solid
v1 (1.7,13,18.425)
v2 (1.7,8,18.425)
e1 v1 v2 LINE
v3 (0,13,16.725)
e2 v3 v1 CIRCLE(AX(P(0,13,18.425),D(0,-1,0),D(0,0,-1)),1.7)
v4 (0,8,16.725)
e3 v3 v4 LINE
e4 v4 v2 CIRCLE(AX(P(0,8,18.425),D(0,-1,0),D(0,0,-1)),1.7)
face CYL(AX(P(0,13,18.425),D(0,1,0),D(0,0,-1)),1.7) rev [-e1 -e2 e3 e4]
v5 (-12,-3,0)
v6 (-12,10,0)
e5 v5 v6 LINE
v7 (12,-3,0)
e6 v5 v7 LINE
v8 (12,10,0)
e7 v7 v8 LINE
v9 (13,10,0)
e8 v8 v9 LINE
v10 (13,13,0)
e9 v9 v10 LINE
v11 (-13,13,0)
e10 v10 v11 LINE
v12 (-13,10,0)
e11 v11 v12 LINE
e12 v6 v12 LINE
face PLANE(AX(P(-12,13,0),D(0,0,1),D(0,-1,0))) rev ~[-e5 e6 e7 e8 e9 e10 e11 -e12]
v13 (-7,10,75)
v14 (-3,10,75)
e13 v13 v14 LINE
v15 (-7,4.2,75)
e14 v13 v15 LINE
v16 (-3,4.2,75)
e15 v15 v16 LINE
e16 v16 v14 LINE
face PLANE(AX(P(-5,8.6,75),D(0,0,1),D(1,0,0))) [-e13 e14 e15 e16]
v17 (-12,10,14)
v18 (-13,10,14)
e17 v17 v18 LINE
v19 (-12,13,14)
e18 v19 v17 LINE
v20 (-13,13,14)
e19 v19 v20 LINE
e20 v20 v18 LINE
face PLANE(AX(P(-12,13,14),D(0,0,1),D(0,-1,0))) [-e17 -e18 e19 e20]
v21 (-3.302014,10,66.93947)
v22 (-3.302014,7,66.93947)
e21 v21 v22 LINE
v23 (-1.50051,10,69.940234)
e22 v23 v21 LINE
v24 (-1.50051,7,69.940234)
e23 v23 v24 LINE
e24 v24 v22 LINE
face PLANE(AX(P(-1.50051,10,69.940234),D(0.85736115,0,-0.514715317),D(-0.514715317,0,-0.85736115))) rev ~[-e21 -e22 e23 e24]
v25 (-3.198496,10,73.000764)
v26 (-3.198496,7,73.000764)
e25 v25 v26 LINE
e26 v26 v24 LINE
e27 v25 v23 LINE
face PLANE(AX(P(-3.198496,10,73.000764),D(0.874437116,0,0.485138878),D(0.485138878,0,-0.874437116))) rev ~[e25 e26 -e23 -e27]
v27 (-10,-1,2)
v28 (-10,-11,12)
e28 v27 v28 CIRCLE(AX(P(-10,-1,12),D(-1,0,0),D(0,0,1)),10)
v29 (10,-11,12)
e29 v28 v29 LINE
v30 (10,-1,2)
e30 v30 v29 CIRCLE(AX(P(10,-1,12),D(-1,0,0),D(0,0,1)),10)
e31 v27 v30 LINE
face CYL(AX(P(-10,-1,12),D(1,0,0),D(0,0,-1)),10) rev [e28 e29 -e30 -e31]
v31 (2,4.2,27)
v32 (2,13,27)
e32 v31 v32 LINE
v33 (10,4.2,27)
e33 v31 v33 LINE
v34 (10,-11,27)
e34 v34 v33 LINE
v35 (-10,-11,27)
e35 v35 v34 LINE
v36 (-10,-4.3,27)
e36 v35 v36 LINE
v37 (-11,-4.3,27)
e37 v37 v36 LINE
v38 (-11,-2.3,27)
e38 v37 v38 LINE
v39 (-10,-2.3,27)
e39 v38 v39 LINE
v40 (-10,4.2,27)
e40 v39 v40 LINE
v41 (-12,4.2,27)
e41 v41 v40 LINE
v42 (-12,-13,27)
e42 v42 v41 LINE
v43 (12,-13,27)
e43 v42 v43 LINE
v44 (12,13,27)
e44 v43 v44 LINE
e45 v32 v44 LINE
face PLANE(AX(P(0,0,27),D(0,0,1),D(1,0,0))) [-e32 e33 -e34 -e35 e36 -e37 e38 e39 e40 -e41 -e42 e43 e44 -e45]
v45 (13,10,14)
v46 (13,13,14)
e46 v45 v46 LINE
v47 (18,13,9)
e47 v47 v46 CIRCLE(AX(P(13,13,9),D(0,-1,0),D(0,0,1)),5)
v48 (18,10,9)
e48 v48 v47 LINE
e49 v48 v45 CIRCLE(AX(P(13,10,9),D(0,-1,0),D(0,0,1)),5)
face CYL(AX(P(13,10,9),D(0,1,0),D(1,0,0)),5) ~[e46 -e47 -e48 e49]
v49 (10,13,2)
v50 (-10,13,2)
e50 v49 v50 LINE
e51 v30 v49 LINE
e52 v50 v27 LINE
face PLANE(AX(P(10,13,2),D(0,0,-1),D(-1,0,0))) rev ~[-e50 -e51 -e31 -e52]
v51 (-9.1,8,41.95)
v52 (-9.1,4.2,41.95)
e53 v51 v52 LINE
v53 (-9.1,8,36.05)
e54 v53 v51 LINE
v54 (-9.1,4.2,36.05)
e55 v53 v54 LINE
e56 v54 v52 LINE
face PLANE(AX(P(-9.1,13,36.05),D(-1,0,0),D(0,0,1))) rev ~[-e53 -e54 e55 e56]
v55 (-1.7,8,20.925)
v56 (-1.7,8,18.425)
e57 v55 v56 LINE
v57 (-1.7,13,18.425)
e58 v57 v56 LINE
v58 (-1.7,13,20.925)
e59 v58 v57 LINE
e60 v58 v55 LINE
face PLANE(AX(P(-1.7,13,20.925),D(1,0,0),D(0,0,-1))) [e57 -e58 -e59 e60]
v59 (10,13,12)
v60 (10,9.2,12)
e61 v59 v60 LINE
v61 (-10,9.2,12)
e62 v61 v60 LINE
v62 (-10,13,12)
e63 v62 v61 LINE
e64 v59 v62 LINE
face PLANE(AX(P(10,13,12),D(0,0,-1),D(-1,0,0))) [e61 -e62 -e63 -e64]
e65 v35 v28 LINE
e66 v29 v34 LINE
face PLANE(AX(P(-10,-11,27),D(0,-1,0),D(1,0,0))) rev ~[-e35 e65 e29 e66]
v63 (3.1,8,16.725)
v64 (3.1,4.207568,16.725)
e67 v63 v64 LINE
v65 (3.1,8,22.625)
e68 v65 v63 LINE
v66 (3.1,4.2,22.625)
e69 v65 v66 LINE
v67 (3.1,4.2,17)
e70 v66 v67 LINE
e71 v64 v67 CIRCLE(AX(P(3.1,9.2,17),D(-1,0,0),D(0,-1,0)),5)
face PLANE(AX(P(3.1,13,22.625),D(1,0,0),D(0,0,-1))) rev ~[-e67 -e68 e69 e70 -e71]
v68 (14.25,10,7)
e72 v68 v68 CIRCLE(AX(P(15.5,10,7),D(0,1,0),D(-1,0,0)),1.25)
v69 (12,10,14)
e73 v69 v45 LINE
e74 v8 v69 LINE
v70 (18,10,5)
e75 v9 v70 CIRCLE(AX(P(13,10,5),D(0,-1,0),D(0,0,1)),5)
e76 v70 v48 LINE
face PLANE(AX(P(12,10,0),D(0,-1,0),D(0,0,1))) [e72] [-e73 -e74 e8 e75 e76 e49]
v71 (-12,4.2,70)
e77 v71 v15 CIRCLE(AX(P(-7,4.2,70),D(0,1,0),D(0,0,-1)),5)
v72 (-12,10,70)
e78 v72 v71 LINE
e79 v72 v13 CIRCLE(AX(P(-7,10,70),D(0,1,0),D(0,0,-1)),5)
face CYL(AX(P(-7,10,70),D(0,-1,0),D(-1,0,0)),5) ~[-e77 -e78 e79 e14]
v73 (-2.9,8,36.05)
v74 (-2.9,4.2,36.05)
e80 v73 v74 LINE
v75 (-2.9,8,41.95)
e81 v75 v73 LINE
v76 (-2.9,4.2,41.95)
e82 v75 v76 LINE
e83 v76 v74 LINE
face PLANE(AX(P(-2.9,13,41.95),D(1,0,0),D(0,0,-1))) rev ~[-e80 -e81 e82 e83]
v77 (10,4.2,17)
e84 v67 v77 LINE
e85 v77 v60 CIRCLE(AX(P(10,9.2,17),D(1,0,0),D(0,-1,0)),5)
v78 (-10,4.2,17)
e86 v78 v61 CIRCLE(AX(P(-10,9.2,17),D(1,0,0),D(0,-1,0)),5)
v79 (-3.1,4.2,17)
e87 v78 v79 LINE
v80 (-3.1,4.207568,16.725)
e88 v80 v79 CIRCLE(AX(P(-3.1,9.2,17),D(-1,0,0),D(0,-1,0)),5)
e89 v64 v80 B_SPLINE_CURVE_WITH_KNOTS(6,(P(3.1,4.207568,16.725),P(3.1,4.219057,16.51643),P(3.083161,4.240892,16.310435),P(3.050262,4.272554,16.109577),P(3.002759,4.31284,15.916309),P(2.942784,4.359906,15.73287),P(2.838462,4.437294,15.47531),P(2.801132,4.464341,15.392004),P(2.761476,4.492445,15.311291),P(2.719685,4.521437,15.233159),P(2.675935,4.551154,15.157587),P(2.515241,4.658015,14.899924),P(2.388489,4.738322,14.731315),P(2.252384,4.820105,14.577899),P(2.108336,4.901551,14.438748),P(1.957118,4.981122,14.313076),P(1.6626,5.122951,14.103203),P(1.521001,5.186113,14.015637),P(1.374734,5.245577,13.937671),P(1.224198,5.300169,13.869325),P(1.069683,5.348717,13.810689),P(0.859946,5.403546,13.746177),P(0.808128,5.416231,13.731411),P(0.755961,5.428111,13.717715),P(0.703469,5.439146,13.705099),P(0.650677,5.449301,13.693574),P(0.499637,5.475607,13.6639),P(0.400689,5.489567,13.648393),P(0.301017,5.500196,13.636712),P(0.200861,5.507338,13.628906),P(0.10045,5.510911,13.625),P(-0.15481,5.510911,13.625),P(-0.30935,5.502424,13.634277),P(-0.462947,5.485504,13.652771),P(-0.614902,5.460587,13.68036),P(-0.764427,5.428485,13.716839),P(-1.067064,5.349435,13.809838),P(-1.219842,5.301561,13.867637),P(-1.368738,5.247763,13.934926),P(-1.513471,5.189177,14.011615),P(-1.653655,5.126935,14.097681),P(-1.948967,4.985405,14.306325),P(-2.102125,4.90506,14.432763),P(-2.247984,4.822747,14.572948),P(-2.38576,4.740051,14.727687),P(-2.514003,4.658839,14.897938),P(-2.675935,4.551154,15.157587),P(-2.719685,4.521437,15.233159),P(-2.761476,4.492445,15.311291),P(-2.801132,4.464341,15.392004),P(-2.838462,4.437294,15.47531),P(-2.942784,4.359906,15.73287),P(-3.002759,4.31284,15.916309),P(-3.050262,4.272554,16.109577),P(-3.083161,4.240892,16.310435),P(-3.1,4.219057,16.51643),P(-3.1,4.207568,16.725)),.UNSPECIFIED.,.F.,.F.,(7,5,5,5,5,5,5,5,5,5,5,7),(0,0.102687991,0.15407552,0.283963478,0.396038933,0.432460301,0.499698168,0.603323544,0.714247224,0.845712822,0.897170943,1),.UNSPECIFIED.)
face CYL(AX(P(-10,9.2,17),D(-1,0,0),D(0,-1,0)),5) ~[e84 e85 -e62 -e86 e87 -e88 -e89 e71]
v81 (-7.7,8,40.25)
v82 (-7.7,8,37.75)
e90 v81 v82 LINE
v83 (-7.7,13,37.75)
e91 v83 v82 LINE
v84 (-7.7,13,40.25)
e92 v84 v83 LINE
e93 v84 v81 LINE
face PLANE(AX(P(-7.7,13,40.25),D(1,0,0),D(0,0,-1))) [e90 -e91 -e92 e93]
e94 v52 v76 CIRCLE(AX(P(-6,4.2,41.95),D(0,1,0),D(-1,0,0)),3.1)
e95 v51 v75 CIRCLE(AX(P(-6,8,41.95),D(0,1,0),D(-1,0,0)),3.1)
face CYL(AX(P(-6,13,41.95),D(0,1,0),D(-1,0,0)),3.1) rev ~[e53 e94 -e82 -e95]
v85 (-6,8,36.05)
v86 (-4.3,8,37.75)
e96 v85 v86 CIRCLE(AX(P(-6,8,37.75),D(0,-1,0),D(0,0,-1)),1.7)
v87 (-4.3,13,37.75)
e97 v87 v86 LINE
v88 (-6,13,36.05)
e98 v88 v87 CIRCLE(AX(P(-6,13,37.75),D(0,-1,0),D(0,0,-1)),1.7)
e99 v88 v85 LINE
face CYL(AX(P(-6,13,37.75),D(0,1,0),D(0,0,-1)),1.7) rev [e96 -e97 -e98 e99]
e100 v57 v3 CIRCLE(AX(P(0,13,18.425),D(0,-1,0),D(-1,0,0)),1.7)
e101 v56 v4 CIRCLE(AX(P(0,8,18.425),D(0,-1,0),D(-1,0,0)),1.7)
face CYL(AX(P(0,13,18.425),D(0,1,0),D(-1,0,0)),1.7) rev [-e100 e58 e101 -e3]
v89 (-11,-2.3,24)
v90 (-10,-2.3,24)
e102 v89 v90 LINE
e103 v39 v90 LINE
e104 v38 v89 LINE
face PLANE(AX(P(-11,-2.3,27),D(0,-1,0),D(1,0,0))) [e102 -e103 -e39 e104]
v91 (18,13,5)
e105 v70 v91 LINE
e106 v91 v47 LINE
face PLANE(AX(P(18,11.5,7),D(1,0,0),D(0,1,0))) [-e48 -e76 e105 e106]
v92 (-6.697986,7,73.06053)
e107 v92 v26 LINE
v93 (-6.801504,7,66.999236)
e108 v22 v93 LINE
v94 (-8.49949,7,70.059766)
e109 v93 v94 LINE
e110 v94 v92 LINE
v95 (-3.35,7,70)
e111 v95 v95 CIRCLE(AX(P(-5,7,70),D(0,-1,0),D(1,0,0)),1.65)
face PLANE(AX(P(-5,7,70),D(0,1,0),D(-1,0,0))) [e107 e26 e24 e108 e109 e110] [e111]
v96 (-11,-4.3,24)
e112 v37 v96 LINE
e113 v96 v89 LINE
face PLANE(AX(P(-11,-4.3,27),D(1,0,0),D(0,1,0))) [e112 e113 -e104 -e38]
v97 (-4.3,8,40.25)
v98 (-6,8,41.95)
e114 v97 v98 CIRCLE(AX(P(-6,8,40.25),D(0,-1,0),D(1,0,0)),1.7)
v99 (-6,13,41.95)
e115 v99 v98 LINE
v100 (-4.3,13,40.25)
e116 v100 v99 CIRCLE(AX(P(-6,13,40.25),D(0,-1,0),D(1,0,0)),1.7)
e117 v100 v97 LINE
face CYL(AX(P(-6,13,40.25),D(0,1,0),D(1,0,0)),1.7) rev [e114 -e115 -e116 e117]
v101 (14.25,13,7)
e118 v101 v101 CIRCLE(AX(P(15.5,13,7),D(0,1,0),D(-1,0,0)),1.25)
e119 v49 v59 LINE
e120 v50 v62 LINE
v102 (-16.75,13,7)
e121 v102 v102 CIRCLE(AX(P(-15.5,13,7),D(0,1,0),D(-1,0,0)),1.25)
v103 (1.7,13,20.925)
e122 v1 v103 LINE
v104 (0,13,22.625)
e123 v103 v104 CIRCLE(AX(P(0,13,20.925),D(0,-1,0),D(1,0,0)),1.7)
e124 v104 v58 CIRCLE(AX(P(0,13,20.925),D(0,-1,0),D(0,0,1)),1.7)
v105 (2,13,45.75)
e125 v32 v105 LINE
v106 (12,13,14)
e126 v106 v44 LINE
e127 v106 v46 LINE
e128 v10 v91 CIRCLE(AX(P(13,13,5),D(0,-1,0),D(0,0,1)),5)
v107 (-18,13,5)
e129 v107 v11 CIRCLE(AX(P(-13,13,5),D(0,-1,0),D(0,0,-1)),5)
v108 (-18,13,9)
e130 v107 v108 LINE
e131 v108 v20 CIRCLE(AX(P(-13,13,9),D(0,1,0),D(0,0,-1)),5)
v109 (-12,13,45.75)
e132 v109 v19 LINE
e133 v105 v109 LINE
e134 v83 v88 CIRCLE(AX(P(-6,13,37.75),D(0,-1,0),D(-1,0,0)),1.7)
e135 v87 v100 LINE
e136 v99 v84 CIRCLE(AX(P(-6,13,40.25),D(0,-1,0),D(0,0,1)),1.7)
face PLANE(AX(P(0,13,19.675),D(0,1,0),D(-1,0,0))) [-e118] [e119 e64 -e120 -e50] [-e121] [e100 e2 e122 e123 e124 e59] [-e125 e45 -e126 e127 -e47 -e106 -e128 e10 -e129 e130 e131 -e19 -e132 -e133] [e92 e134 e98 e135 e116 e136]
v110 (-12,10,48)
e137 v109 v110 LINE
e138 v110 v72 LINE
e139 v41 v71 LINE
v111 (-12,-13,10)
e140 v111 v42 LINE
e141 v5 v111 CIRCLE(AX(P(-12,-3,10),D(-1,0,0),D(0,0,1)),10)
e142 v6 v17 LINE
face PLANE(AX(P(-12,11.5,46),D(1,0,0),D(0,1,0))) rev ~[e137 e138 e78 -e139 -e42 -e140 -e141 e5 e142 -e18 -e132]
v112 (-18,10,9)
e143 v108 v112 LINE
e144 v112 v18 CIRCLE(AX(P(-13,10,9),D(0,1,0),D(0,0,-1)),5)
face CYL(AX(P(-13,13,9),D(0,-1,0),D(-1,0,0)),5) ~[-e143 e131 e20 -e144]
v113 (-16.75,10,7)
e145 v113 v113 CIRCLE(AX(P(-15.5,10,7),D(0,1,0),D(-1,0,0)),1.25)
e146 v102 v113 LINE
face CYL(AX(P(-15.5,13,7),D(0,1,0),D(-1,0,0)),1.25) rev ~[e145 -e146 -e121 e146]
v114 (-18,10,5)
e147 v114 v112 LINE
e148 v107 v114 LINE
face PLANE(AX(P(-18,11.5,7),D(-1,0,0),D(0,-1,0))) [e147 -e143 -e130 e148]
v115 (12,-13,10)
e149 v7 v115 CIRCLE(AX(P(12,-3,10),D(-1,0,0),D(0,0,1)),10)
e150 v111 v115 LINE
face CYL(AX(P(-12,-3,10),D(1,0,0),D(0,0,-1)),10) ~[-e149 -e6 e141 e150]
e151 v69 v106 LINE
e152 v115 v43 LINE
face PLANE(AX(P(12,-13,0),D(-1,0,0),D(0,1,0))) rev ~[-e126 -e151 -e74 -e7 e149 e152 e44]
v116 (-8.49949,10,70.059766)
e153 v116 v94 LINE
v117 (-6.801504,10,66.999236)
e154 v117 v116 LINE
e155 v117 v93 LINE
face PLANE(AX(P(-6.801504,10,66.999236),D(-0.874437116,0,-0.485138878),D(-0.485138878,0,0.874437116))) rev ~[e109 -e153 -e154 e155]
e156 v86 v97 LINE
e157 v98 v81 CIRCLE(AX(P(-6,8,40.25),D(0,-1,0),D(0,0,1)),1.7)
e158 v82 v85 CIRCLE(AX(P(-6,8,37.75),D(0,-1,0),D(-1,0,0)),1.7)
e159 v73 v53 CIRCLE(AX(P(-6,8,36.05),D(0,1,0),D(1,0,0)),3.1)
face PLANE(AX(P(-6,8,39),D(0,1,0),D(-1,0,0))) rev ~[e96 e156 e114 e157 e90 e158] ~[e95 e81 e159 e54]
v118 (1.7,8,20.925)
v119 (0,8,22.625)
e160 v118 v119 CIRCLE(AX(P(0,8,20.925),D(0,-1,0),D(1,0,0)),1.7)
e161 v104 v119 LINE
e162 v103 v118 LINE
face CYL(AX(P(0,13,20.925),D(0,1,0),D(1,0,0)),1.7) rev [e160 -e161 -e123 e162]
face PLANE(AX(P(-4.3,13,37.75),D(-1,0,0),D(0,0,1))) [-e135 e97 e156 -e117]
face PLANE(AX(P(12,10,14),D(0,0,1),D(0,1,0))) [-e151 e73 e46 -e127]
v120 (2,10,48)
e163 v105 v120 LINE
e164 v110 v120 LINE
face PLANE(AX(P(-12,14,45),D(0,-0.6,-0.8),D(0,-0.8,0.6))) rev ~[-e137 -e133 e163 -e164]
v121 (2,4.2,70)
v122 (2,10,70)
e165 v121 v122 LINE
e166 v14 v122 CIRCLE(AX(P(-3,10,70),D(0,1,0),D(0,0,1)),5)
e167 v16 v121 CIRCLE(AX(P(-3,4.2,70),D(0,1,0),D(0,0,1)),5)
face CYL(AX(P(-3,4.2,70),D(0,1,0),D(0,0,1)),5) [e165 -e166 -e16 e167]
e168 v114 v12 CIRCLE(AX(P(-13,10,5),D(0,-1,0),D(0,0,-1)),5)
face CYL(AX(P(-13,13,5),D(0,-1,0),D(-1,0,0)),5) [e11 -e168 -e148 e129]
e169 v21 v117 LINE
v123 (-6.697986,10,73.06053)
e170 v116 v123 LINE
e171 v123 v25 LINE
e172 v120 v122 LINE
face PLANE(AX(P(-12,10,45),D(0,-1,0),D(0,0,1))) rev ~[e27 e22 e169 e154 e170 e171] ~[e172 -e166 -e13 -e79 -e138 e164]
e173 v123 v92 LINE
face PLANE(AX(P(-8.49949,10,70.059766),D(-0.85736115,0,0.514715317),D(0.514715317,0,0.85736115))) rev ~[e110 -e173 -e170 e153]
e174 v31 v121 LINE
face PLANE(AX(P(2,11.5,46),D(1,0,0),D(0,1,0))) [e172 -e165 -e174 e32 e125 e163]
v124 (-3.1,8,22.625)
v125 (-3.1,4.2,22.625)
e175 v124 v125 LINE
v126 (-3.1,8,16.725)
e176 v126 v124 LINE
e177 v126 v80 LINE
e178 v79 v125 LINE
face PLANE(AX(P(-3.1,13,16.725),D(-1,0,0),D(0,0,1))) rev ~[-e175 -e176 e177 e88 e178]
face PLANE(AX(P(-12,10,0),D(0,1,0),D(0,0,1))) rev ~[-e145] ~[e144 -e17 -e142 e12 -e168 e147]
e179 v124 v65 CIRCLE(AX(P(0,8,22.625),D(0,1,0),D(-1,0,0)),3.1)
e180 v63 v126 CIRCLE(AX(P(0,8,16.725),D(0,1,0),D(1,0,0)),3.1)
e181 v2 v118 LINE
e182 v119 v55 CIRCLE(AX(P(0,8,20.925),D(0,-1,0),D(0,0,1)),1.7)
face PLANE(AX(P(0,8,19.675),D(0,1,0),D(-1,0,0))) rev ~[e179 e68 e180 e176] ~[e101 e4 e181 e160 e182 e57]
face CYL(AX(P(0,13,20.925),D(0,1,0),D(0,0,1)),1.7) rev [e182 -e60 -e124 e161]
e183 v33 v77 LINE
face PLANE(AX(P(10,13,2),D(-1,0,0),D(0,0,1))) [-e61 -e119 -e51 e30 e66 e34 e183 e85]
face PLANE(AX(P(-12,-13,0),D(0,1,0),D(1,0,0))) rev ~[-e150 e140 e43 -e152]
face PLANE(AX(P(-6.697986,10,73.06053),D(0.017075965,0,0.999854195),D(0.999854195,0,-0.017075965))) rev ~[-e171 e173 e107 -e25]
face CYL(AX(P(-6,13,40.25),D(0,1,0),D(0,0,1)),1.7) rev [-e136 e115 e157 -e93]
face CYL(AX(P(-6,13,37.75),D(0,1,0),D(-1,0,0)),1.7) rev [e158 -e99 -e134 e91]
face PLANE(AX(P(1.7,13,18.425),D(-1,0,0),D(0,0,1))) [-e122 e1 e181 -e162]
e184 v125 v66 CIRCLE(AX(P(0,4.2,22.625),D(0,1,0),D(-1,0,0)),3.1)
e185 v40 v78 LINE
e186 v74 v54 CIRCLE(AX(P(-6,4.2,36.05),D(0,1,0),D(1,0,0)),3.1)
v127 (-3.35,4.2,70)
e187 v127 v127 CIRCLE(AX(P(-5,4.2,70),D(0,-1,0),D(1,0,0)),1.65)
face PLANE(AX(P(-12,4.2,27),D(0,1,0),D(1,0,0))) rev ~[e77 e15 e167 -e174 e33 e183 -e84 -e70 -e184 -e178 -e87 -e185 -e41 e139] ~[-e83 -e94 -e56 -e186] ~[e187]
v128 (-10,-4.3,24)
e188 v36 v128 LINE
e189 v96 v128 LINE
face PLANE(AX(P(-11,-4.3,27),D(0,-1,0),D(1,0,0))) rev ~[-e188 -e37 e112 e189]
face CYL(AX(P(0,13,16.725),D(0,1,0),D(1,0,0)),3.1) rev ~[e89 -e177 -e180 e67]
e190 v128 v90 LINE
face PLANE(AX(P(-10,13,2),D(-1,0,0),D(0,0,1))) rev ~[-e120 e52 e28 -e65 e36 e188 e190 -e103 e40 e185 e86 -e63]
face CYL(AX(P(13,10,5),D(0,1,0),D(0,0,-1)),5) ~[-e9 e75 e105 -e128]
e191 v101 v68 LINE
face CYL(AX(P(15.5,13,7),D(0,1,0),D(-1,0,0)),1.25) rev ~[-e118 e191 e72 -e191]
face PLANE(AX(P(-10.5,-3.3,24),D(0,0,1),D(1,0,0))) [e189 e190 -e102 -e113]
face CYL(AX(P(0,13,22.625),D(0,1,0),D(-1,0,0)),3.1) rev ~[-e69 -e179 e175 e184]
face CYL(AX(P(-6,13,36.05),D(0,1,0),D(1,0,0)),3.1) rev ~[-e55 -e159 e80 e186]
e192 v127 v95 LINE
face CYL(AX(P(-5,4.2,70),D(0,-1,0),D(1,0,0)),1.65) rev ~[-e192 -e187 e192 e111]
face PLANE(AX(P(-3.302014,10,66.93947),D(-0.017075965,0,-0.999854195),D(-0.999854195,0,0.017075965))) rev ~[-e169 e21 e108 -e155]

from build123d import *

# Parameters (mm, degrees)
F0_W         = 24
F0_H         = 26
F1_DEPTH     = 27
F2_W         = 20
F2_H         = 15.2
F3_DEPTH     = 25
F4_W         = 20
F4_H         = 10
F5_DEPTH     = 24
F7_W         = 3
F7_H         = 14
F8_DEPTH     = 6
F6_W         = 3
F6_H         = 14
F9_DEPTH     = 6
F10_R        = 1.25
F11_DEPTH    = 3
F12_R        = 5
F14_DEPTH    = 48
F15_W        = 3
F15_H        = 30
F16_DEPTH    = 14
F17_T4_DEPTH = 14
F18_R        = 1.65
F19_DEPTH    = 5.8
F21_DEPTH    = 3
F23_DEPTH    = 8.8
F24_DEPTH    = 5
F25_R        = 10
F26_T1_DEPTH = 20
F27_W        = 1
F27_H        = 2
F28_DEPTH    = 3
F29_R        = 5


# Not quite as in the source:
# - a fillet or chamfer that OpenCascade refuses, or shapes differently, is made with other operations: its cross-section is extruded or revolved along the edge and cut away or added


with BuildPart() as f1:
    # F0 (on Top) → F1 (new body)
    with BuildSketch(Plane.XY):
        Rectangle(F0_W, F0_H)
    extrude(amount=F1_DEPTH)

    # F2 (on face) → F3 (cut)
    with BuildSketch(Plane.XY.offset(27)):
        with Locations((0, -3.4)):
            Rectangle(F2_W, F2_H)
    extrude(amount=-F3_DEPTH, mode=Mode.SUBTRACT)

    # F4 (on face) → F5 (cut, through all)
    with BuildSketch(Plane(origin=(0, 13, 0), x_dir=(-1, 0, 0), z_dir=(0, 1, 0))):
        with Locations((0, 7)):
            Rectangle(F4_W, F4_H)
    extrude(amount=-F5_DEPTH, mode=Mode.SUBTRACT)

    # F7 (on face) → F8 (join)
    with BuildSketch(Plane.YZ.offset(12)):
        with Locations((11.5, 7)):
            Rectangle(F7_W, F7_H)
    extrude(amount=F8_DEPTH)

    # F6 (on face) → F9 (join)
    with BuildSketch(Plane(origin=(-12, 0, 0), x_dir=(0, -1, 0), z_dir=(-1, 0, 0))):
        with Locations((-11.5, 7)):
            Rectangle(F6_W, F6_H)
    extrude(amount=F9_DEPTH)

    # F10 (on face) → F11 (cut, through all)
    with BuildSketch(Plane(origin=(0, 13, 0), x_dir=(-1, 0, 0), z_dir=(0, 1, 0))):
        with Locations((-15.5, 7)):
            Circle(F10_R)
        with Locations((15.5, 7)):
            Circle(F10_R)
    extrude(amount=-F11_DEPTH, mode=Mode.SUBTRACT)

    # F12
    f12_edges = [f1.edges().sort_by_distance(p)[0] for p in [
        (18, 11.5, 14),
        (18, 11.5, 0),
        (-18, 11.5, 14),
        (-18, 11.5, 0),
    ]]
    fillet(f12_edges, radius=F12_R)

    # F13 (on face) → F14 (join)
    with BuildSketch(Plane.XY.offset(27)):
        Polygon((2, 13), (-12, 13), (-12, 4.2), (-10, 4.2), (2, 4.2), align=None)
    extrude(amount=F14_DEPTH)

    # F15 (on face) → F16 (cut, through all)
    with BuildSketch(Plane(origin=(-12, 0, 0), x_dir=(0, -1, 0), z_dir=(-1, 0, 0))):
        with Locations((-11.5, 60)):
            Rectangle(F15_W, F15_H)
    extrude(amount=-F16_DEPTH, mode=Mode.SUBTRACT)

    # F17: chamfer of 3 x 4 on 1 edges, made by hand


with BuildPart() as f17_tool2:
    # F17_s3 → F17_t4 (new body)
    with BuildSketch(Plane.YZ.offset(-12)):
        Polygon((14, 45), (10, 48), (10, 45), align=None)
    extrude(amount=F17_T4_DEPTH)

    split(bisect_by=Plane.XZ.offset(-13), keep=Keep.TOP)


with BuildPart() as f1_1:
    add(f1.part)

    # F17_t1: union F17_tool2
    add(f17_tool2.part)

    # F18 (on face) → F19 (cut, through all)
    with BuildSketch(Plane.XZ.offset(-4.2)):
        with Locations((-5, 70)):
            Circle(F18_R)
    extrude(amount=-F19_DEPTH, mode=Mode.SUBTRACT)

    # F20 (on face) → F21 (cut)
    with BuildSketch(Plane(origin=(0, 10, 0), x_dir=(-1, 0, 0), z_dir=(0, 1, 0))):
        Polygon((8.4994896827, 70.0597658786), (6.6979860722, 73.0605299049), (3.1984963894, 73.0007640263), (1.5005103171, 69.9402341215), (3.3020139276, 66.9394700952), (6.8015036104, 66.9992359738), align=None)
    extrude(amount=-F21_DEPTH, mode=Mode.SUBTRACT)

    # F22 (on face) → F23 (cut, through all)
    with BuildSketch(Plane(origin=(0, 13, 0), x_dir=(-1, 0, 0), z_dir=(0, 1, 0))):
        with BuildLine():
            ThreePointArc((3.1, 22.625), (0, 25.725), (-3.1, 22.625))
            Line((-3.1, 22.625), (-3.1, 16.725))
            ThreePointArc((-3.1, 16.725), (0, 13.625), (3.1, 16.725))
            Line((3.1, 16.725), (3.1, 22.625))
        make_face()
        with BuildLine():
            Line((1.7, 20.925), (1.7, 18.425))
            ThreePointArc((1.7, 18.425), (1.202081528, 17.222918472), (0, 16.725))
            ThreePointArc((0, 16.725), (-1.202081528, 17.222918472), (-1.7, 18.425))
            Line((-1.7, 18.425), (-1.7, 20.925))
            ThreePointArc((-1.7, 20.925), (-1.202081528, 22.127081528), (0, 22.625))
            ThreePointArc((0, 22.625), (1.202081528, 22.127081528), (1.7, 20.925))
        make_face(mode=Mode.SUBTRACT)
        with BuildLine():
            ThreePointArc((9.1, 41.95), (6, 45.05), (2.9, 41.95))
            Line((2.9, 41.95), (2.9, 36.05))
            ThreePointArc((2.9, 36.05), (6, 32.95), (9.1, 36.05))
            Line((9.1, 36.05), (9.1, 41.95))
        make_face()
        with BuildLine():
            ThreePointArc((4.3, 40.25), (4.797918472, 41.452081528), (6, 41.95))
            ThreePointArc((6, 41.95), (7.202081528, 41.452081528), (7.7, 40.25))
            Line((7.7, 40.25), (7.7, 37.75))
            ThreePointArc((7.7, 37.75), (7.202081528, 36.547918472), (6, 36.05))
            ThreePointArc((6, 36.05), (4.797918472, 36.547918472), (4.3, 37.75))
            Line((4.3, 37.75), (4.3, 40.25))
        make_face(mode=Mode.SUBTRACT)
        with BuildLine():
            ThreePointArc((-1.7, 18.425), (-1.202081528, 17.222918472), (0, 16.725))
            Line((0, 16.725), (0, 22.625))
            ThreePointArc((0, 22.625), (-1.202081528, 22.127081528), (-1.7, 20.925))
            Line((-1.7, 20.925), (-1.7, 18.425))
        make_face()
        with BuildLine():
            ThreePointArc((0, 16.725), (1.202081528, 17.222918472), (1.7, 18.425))
            Line((1.7, 18.425), (1.7, 20.925))
            ThreePointArc((1.7, 20.925), (1.202081528, 22.127081528), (0, 22.625))
            Line((0, 22.625), (0, 16.725))
        make_face()
        with BuildLine():
            Line((6, 41.95), (6, 40.25))
            Line((6, 40.25), (6, 37.75))
            Line((6, 37.75), (6, 36.05))
            ThreePointArc((6, 36.05), (7.202081528, 36.547918472), (7.7, 37.75))
            Line((7.7, 37.75), (7.7, 40.25))
            ThreePointArc((7.7, 40.25), (7.202081528, 41.452081528), (6, 41.95))
        make_face()
        with BuildLine():
            Line((6, 37.75), (6, 40.25))
            Line((6, 40.25), (6, 41.95))
            ThreePointArc((6, 41.95), (4.797918472, 41.452081528), (4.3, 40.25))
            Line((4.3, 40.25), (4.3, 37.75))
            ThreePointArc((4.3, 37.75), (4.797918472, 36.547918472), (6, 36.05))
            Line((6, 36.05), (6, 37.75))
        make_face()
    extrude(amount=-F23_DEPTH, mode=Mode.SUBTRACT)

    # F22 (on face) → F24 (join)
    with BuildSketch(Plane(origin=(0, 13, 0), x_dir=(-1, 0, 0), z_dir=(0, 1, 0))):
        with BuildLine():
            ThreePointArc((3.1, 22.625), (0, 25.725), (-3.1, 22.625))
            Line((-3.1, 22.625), (-3.1, 16.725))
            ThreePointArc((-3.1, 16.725), (0, 13.625), (3.1, 16.725))
            Line((3.1, 16.725), (3.1, 22.625))
        make_face()
        with BuildLine():
            Line((1.7, 20.925), (1.7, 18.425))
            ThreePointArc((1.7, 18.425), (1.202081528, 17.222918472), (0, 16.725))
            ThreePointArc((0, 16.725), (-1.202081528, 17.222918472), (-1.7, 18.425))
            Line((-1.7, 18.425), (-1.7, 20.925))
            ThreePointArc((-1.7, 20.925), (-1.202081528, 22.127081528), (0, 22.625))
            ThreePointArc((0, 22.625), (1.202081528, 22.127081528), (1.7, 20.925))
        make_face(mode=Mode.SUBTRACT)
        with BuildLine():
            ThreePointArc((9.1, 41.95), (6, 45.05), (2.9, 41.95))
            Line((2.9, 41.95), (2.9, 36.05))
            ThreePointArc((2.9, 36.05), (6, 32.95), (9.1, 36.05))
            Line((9.1, 36.05), (9.1, 41.95))
        make_face()
        with BuildLine():
            ThreePointArc((4.3, 40.25), (4.797918472, 41.452081528), (6, 41.95))
            ThreePointArc((6, 41.95), (7.202081528, 41.452081528), (7.7, 40.25))
            Line((7.7, 40.25), (7.7, 37.75))
            ThreePointArc((7.7, 37.75), (7.202081528, 36.547918472), (6, 36.05))
            ThreePointArc((6, 36.05), (4.797918472, 36.547918472), (4.3, 37.75))
            Line((4.3, 37.75), (4.3, 40.25))
        make_face(mode=Mode.SUBTRACT)
    extrude(amount=-F24_DEPTH)

    # F25
    f25_edges = [f1_1.edges().sort_by_distance(p)[0] for p in [
        (0, -13, 0),
        (0, -11, 2),
    ]]
    fillet(f25_edges, radius=F25_R)

    # F26: fillet of radius 5 on 1 edges, made by hand

    # F26_s2 → F26_t1 (cut)
    with BuildSketch(Plane.YZ.offset(-10)):
        with BuildLine():
            ThreePointArc((4.2, 17), (5.6644660941, 13.4644660941), (9.2, 12))
            Line((9.2, 12), (4.2, 12))
            Line((4.2, 12), (4.2, 17))
        make_face()
    extrude(amount=F26_T1_DEPTH, mode=Mode.SUBTRACT)

    # F27 (on face) → F28 (cut)
    with BuildSketch(Plane.XY.offset(27)):
        with Locations((-10.5, -3.3)):
            Rectangle(F27_W, F27_H)
    extrude(amount=-F28_DEPTH, mode=Mode.SUBTRACT)

    # F29
    f29_edges = [f1_1.edges().sort_by_distance(p)[0] for p in [
        (-12, 7.1, 75),
        (2, 7.1, 75),
    ]]
    fillet(f29_edges, radius=F29_R)


solid = f1_1.part
